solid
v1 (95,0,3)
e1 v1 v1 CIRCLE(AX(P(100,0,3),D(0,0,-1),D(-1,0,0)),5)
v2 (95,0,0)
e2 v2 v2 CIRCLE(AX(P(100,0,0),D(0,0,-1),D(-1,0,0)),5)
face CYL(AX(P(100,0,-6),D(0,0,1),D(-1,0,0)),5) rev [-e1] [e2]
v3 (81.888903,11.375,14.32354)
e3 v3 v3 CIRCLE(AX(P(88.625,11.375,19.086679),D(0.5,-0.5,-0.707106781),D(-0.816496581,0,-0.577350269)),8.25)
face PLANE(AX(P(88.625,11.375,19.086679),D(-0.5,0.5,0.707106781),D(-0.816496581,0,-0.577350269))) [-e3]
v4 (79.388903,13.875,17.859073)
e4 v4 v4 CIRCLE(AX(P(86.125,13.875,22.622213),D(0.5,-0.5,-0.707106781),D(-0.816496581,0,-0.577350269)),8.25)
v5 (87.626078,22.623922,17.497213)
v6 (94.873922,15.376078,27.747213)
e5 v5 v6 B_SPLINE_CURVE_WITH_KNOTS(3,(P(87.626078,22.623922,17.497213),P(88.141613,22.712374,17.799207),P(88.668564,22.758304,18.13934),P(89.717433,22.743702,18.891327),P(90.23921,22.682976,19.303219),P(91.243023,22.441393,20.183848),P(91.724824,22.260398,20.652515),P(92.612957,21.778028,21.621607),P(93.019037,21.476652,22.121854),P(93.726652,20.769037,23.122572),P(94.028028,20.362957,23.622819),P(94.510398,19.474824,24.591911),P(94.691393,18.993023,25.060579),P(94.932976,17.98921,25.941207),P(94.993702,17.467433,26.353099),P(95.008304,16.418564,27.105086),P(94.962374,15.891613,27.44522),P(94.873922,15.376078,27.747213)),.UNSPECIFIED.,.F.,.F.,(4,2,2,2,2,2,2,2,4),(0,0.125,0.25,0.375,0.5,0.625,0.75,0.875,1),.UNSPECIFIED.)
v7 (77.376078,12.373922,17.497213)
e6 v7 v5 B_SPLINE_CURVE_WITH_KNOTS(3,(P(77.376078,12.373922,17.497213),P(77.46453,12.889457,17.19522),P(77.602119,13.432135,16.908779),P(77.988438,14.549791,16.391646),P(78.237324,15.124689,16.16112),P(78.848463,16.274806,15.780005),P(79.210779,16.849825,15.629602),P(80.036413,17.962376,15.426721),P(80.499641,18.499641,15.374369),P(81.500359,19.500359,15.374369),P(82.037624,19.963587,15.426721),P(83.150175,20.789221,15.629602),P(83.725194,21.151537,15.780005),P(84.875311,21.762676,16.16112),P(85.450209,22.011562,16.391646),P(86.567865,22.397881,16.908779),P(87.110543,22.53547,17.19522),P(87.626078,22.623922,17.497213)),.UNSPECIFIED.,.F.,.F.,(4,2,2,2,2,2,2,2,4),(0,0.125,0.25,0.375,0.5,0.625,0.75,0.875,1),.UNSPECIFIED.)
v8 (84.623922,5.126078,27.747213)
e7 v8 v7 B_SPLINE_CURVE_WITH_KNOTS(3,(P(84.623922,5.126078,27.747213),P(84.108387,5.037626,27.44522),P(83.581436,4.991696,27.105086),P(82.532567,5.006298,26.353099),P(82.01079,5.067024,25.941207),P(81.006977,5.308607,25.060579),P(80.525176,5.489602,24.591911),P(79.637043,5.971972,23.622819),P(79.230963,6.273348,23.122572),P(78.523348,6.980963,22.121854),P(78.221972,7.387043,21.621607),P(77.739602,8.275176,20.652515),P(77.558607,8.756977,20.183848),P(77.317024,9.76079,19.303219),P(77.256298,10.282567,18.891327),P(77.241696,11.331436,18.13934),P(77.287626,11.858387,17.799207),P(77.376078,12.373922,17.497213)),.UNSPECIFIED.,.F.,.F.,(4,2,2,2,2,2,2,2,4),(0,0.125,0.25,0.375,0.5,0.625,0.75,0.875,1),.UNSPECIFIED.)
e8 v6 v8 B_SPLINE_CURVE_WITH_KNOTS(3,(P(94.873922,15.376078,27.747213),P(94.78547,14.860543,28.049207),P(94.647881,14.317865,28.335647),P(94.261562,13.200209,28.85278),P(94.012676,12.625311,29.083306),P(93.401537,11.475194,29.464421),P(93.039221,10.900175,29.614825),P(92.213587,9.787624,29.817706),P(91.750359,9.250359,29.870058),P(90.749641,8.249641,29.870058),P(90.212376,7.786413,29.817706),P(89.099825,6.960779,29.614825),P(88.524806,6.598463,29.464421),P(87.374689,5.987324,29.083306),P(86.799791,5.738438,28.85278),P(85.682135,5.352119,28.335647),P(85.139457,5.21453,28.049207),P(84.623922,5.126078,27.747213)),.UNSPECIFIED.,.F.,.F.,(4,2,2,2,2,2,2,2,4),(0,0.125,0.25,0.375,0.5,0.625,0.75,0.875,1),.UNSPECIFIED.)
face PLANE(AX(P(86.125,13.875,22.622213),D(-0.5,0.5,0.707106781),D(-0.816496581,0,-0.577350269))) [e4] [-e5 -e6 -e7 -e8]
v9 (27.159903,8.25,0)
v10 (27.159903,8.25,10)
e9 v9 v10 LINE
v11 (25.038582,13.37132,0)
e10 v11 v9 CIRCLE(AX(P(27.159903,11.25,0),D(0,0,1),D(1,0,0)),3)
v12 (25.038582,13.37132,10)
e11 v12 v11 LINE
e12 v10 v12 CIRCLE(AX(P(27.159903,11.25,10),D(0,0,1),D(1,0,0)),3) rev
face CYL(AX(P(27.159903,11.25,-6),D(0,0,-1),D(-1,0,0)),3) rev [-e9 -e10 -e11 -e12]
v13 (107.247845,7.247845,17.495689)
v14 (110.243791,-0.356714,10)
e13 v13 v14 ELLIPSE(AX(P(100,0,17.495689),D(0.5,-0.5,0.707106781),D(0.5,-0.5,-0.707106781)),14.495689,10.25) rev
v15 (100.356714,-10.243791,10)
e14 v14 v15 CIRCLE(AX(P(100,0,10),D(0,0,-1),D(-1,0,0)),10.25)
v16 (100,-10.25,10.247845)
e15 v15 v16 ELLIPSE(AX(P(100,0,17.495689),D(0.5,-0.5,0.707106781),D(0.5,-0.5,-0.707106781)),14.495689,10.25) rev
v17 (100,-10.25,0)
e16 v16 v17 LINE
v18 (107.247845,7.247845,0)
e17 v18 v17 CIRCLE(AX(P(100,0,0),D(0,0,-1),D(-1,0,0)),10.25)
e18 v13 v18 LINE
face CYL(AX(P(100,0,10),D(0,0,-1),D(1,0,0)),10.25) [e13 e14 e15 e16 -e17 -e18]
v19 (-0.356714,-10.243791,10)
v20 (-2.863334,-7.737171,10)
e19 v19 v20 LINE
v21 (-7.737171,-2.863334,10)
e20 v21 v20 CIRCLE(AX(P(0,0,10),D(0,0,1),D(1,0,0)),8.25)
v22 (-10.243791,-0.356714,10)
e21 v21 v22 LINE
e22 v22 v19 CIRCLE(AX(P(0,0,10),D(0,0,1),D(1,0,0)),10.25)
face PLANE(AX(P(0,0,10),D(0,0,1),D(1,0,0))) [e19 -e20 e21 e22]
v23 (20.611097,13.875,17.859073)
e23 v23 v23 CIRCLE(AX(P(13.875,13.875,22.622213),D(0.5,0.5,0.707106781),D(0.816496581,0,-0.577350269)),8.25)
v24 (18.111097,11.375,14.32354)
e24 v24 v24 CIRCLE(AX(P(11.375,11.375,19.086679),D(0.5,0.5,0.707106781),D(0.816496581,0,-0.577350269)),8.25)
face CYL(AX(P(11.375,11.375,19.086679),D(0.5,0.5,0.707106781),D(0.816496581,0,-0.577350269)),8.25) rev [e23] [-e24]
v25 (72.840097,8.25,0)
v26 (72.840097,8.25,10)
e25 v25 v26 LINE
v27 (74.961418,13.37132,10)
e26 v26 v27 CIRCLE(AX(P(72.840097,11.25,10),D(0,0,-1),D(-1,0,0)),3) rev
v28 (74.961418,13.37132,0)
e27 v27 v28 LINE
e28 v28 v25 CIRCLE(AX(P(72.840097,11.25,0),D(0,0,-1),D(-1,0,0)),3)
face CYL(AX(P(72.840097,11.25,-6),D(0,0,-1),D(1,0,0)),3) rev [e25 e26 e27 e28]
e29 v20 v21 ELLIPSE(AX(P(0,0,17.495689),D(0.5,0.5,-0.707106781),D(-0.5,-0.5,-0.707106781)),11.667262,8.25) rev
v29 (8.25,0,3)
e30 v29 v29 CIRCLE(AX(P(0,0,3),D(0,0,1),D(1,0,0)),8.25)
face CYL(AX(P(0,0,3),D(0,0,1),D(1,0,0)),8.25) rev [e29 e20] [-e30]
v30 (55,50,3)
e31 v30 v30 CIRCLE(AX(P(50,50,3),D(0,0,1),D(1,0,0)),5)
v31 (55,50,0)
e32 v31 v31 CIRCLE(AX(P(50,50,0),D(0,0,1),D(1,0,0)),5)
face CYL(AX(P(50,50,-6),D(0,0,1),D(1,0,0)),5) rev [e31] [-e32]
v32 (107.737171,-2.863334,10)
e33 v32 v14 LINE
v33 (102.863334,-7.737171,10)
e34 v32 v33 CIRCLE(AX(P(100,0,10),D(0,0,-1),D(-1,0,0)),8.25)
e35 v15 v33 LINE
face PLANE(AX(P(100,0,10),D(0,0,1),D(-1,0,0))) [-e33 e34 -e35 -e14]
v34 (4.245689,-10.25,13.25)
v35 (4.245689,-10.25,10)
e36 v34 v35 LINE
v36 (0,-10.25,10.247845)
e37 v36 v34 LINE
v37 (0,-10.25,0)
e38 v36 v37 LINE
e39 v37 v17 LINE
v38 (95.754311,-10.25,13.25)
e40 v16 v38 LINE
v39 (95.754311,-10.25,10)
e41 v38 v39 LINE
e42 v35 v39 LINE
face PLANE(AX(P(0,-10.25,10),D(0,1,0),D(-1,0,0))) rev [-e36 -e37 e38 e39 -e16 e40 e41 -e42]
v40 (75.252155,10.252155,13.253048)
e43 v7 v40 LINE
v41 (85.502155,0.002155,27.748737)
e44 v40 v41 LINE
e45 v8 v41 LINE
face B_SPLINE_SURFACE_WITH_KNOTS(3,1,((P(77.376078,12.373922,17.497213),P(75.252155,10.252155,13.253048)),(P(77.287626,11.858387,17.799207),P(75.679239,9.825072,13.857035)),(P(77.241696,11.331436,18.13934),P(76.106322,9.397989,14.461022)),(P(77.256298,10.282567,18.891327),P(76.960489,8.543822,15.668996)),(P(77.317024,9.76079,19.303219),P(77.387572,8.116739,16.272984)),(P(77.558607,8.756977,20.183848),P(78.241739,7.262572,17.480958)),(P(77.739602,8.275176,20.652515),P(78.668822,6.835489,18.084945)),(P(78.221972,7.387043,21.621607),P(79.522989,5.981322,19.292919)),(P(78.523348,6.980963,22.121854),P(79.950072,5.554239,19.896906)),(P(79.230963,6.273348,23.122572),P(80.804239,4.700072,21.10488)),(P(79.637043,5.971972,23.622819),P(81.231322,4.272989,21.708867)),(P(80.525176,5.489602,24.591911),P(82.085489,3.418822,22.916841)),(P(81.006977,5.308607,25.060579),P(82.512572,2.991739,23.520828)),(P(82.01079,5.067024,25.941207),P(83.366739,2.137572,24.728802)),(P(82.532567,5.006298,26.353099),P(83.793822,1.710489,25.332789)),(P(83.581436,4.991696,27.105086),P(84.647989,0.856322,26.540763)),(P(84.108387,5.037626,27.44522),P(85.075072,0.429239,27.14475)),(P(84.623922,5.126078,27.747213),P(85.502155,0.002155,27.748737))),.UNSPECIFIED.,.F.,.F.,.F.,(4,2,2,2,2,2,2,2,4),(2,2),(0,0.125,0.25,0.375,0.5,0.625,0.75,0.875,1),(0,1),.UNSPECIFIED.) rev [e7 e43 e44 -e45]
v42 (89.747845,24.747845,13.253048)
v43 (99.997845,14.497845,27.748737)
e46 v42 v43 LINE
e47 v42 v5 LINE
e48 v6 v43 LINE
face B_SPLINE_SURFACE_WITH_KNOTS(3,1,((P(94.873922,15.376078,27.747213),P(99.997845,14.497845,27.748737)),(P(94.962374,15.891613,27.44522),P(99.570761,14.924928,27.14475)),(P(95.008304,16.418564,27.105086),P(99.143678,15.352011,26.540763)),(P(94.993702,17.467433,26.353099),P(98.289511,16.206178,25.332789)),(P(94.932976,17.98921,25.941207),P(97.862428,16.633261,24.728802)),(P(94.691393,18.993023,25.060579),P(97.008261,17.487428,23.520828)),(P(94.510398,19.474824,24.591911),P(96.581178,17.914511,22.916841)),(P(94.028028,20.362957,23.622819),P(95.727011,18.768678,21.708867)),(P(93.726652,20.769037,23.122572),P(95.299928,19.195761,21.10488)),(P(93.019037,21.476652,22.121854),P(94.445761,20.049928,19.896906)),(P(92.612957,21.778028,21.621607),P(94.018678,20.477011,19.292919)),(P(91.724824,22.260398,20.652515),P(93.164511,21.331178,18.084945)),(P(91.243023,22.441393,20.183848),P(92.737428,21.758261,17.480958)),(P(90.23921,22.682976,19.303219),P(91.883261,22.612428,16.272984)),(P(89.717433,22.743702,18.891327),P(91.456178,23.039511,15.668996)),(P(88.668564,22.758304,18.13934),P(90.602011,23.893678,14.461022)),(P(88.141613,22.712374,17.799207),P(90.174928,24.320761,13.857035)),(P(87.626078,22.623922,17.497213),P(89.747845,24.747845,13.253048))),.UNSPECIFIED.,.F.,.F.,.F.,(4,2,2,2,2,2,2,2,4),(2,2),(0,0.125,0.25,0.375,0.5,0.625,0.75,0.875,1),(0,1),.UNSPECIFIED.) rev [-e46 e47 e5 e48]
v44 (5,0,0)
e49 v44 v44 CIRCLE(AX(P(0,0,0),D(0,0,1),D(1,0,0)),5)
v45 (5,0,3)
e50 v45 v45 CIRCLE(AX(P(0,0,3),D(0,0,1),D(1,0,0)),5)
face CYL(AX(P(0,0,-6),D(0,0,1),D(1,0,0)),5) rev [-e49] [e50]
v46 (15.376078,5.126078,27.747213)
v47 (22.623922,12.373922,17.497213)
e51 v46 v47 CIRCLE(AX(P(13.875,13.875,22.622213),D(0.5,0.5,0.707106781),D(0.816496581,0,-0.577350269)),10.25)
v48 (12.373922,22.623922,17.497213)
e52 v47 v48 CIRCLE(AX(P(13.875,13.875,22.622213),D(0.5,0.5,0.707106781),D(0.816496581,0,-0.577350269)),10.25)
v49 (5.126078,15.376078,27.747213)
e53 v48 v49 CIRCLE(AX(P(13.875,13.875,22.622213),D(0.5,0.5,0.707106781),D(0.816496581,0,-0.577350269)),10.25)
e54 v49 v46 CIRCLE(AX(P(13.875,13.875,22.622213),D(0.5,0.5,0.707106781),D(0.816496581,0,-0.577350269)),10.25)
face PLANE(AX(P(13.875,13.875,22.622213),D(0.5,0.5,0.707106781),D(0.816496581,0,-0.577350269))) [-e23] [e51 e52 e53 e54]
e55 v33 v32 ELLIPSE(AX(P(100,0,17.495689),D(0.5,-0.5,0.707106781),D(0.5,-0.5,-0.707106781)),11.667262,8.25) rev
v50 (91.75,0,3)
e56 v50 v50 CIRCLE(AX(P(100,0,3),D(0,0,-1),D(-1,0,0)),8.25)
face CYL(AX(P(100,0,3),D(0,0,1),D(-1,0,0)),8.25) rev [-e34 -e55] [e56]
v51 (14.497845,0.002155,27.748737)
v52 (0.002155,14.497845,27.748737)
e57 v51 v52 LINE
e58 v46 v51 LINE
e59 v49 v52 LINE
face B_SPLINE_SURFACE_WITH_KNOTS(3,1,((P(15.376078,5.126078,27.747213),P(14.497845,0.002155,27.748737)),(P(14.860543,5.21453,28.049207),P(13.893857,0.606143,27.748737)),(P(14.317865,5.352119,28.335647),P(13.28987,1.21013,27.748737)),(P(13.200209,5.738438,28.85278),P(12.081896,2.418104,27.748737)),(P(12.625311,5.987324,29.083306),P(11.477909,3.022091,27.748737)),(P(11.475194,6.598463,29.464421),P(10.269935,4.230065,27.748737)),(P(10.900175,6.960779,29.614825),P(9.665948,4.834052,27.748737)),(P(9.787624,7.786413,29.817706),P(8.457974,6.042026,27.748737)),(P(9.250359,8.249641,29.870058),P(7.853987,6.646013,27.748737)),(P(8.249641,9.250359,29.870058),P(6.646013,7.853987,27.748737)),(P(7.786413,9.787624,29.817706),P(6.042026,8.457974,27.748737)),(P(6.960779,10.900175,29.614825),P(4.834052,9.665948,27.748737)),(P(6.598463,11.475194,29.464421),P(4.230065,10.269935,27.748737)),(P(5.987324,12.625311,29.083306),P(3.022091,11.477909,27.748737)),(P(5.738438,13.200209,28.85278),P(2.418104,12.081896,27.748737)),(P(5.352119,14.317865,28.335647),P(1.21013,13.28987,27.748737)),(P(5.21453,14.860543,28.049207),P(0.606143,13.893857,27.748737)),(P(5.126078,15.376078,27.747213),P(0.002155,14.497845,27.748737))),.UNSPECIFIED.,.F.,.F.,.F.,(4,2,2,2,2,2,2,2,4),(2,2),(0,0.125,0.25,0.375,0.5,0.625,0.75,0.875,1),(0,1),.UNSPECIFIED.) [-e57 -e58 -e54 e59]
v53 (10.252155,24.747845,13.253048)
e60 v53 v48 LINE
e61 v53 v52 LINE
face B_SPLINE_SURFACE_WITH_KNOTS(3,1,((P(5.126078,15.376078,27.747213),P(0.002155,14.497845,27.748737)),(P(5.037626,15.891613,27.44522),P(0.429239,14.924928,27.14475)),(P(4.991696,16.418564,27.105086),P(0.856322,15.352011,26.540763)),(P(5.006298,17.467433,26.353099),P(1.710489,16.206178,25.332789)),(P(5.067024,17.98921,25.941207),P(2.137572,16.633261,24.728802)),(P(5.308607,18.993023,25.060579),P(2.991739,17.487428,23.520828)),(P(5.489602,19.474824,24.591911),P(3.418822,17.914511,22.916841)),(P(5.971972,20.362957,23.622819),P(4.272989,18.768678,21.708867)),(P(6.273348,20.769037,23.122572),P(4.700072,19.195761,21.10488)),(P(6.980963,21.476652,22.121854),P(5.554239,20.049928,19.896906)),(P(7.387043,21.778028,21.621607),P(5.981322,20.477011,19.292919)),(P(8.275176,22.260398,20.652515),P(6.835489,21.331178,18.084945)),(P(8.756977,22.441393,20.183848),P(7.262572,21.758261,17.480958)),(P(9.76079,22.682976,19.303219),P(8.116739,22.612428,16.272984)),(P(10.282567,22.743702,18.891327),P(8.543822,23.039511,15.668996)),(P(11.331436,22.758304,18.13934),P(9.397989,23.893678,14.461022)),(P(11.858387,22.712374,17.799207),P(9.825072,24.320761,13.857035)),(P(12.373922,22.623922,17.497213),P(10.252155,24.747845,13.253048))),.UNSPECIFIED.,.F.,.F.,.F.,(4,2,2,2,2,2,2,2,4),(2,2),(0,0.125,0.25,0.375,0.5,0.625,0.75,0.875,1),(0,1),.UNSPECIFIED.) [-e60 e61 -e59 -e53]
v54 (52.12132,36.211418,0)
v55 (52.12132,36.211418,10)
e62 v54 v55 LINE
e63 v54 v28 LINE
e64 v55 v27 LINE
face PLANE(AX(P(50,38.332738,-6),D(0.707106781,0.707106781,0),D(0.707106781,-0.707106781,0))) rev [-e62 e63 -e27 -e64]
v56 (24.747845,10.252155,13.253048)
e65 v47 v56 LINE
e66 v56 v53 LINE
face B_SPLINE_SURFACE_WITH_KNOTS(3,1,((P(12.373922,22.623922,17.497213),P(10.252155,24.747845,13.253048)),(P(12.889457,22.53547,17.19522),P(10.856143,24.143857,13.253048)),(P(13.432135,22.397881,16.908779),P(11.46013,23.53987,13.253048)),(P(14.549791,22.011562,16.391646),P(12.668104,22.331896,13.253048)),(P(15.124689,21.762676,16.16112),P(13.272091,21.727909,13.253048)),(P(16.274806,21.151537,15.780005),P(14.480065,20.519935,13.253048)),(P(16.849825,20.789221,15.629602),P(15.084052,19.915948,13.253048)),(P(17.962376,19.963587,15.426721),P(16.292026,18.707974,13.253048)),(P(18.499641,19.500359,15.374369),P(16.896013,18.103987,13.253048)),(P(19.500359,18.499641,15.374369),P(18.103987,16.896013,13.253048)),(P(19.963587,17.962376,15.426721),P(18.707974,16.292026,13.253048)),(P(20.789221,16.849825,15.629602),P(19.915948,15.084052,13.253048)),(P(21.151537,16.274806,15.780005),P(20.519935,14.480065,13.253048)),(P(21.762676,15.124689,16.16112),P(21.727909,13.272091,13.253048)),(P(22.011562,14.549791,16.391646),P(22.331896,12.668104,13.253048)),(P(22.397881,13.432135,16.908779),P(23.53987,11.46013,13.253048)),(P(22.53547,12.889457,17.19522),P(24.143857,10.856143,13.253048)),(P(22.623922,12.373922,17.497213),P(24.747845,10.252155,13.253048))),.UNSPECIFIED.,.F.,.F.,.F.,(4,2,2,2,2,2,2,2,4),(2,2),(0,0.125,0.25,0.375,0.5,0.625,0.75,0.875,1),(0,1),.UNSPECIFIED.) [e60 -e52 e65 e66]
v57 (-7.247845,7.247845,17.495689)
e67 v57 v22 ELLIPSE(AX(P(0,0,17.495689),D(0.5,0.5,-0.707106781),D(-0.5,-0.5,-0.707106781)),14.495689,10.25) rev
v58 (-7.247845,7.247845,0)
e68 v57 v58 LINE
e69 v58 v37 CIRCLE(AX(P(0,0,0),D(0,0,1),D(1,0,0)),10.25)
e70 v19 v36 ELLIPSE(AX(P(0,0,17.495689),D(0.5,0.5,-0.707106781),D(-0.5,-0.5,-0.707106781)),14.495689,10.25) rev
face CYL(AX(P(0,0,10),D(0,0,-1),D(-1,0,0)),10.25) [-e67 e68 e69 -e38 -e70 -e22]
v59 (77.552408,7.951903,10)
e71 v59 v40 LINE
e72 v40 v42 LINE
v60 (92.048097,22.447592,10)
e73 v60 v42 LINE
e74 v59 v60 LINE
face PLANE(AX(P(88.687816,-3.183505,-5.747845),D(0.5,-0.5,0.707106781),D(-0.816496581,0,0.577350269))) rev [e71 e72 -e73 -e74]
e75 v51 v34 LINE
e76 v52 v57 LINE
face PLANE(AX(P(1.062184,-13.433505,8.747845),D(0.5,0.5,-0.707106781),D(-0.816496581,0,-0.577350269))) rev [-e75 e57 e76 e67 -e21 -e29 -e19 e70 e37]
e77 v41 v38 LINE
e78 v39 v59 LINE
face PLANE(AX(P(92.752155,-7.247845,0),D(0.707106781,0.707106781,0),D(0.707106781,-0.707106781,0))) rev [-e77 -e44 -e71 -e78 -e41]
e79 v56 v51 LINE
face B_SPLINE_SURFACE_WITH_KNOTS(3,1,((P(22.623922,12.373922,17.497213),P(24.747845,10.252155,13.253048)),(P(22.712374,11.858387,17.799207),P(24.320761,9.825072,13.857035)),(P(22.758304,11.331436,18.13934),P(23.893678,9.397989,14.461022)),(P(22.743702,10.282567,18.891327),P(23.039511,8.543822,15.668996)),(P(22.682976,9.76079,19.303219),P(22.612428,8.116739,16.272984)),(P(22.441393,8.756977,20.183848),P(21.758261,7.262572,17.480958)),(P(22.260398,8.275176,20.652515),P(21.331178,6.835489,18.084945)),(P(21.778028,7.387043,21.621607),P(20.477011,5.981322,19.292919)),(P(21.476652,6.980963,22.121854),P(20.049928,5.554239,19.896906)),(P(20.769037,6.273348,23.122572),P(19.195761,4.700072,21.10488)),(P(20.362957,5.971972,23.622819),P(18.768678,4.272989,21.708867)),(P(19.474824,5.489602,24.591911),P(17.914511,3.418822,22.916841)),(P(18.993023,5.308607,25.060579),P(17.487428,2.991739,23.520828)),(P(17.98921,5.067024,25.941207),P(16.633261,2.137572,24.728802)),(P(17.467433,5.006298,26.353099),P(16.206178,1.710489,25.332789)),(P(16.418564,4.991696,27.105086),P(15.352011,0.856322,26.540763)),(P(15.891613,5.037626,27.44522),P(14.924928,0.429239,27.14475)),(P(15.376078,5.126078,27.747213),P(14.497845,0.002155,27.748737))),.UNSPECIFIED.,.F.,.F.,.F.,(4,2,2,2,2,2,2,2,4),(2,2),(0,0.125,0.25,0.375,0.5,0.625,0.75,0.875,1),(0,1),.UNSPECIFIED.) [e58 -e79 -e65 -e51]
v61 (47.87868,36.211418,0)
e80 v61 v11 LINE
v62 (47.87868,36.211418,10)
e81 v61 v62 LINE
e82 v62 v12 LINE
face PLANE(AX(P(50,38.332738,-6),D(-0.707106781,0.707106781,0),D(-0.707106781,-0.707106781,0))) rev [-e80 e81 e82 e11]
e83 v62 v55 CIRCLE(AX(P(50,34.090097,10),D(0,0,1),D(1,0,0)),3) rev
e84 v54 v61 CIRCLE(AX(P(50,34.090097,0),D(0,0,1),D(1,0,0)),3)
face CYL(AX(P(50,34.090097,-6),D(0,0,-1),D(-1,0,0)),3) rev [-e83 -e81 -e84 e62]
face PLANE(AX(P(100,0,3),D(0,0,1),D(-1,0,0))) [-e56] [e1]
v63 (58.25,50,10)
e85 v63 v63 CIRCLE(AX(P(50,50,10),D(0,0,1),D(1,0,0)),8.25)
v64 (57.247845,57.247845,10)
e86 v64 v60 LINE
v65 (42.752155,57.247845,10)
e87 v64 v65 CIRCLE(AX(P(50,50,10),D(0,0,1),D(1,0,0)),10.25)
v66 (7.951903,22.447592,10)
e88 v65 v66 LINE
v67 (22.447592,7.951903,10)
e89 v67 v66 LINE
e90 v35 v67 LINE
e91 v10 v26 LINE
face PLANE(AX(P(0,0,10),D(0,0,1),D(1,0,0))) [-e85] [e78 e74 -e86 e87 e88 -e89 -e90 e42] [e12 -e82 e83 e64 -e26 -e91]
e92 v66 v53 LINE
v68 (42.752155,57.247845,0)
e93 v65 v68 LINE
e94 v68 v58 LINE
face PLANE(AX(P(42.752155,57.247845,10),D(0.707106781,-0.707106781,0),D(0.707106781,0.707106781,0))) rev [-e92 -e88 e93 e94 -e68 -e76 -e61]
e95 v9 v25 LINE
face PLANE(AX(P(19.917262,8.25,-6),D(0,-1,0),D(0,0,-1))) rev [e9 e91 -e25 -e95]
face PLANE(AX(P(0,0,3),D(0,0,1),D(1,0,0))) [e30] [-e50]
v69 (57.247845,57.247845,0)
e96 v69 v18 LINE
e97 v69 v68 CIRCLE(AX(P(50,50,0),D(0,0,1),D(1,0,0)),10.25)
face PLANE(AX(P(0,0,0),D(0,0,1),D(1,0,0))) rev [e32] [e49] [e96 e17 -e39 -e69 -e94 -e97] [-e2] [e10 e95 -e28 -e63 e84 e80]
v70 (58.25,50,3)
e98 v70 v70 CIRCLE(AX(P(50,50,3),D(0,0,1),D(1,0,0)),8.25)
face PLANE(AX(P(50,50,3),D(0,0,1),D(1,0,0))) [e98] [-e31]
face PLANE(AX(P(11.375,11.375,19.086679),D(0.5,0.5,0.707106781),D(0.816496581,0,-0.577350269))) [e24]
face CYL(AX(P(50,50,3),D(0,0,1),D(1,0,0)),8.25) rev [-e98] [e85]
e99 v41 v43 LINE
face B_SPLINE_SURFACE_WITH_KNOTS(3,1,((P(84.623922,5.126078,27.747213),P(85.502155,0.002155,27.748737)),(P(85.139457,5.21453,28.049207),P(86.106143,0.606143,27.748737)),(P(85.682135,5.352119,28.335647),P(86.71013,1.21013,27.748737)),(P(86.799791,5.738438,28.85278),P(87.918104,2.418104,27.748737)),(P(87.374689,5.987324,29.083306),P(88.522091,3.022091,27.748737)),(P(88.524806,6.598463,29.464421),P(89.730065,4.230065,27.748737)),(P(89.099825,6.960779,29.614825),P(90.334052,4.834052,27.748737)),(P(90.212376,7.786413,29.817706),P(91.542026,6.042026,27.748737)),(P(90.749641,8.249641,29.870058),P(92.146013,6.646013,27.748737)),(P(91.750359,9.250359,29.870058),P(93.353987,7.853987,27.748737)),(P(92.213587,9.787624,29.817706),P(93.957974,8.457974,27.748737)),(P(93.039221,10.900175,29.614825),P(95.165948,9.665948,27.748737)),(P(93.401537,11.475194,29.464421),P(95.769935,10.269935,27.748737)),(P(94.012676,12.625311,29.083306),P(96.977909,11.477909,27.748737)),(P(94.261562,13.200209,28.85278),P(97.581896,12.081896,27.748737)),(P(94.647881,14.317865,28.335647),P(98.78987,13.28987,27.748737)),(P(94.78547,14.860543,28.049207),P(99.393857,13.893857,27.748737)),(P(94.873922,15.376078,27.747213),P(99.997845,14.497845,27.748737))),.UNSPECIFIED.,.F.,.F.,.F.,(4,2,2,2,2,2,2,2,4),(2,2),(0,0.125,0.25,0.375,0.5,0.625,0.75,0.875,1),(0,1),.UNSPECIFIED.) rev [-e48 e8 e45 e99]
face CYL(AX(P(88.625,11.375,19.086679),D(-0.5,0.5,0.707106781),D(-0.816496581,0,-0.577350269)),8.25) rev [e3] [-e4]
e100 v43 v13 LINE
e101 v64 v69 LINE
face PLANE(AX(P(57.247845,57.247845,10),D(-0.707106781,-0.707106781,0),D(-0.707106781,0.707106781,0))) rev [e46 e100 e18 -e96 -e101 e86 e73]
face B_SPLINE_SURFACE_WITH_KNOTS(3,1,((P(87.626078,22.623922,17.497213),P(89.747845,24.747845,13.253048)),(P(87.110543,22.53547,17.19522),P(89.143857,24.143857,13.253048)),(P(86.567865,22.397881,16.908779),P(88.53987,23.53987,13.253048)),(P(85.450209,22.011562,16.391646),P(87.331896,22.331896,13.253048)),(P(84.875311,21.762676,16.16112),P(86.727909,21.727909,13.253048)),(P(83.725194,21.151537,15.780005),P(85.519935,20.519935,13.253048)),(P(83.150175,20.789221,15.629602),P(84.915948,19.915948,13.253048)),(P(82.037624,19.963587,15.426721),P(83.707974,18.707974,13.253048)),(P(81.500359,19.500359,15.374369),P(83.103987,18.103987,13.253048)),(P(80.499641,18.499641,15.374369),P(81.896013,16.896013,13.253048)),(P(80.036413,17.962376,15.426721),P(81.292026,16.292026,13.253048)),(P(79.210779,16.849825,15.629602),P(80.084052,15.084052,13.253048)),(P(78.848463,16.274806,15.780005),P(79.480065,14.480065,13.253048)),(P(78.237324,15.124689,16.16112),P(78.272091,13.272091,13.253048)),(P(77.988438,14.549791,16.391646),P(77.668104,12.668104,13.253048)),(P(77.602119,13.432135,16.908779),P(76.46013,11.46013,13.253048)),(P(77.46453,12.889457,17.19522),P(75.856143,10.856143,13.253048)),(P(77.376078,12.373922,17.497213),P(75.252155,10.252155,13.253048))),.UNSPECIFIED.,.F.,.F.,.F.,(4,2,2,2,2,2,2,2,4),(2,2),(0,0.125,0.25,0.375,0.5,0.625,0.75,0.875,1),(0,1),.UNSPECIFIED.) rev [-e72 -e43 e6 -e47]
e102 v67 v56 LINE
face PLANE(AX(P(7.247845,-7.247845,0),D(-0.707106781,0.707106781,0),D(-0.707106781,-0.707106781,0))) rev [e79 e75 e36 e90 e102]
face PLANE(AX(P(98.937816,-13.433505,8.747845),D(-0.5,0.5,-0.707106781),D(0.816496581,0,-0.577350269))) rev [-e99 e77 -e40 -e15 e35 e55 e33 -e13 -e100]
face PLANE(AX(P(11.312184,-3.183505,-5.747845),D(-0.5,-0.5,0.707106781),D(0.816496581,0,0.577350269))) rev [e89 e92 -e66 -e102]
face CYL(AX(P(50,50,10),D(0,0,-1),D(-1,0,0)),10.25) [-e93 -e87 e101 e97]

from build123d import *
from build123d.topology import SkipClean

# Parameters (mm, degrees)
BOSS_EXTRUDE1_DEPTH = 10
SKETCH2_R           = 8.25
CUT_EXTRUDE1_DEPTH  = 7
CUT_EXTRUDE2_DEPTH  = 16
FILLET2_R           = 3
SKETCH5_R           = 5
CUT_EXTRUDE3_DEPTH  = 16
BOSS_EXTRUDE2_DEPTH = 20.5
CUT_EXTRUDE4_START  = 20
SKETCH7_R           = 8.25
SKETCH7_R_2         = 5
CUT_EXTRUDE4_DEPTH  = 20
SKETCH9_R           = 8.25
CUT_EXTRUDE5_DEPTH  = 5
SKETCH10_W          = 60.25
SKETCH10_H          = 70.5
CUT_EXTRUDE6_DEPTH  = 45


with BuildPart() as part:
    # Sketch1 → Boss-Extrude1 (new body)
    with BuildSketch(Plane.XY):
        with BuildLine():
            Line((0, 10.25), (100, 10.25))
            ThreePointArc((100, 10.25), (110.25, 0), (100, -10.25))
            Line((100, -10.25), (0, -10.25))
            ThreePointArc((0, -10.25), (-10.25, 0), (0, 10.25))
        make_face()
        with BuildLine():
            Line((92.752155493, -7.247844507), (42.752155493, 42.752155493))
            ThreePointArc((42.752155493, 42.752155493), (42.752155493, 57.247844507), (57.247844507, 57.247844507))
            Line((57.247844507, 57.247844507), (107.247844507, 7.247844507))
            ThreePointArc((107.247844507, 7.247844507), (107.247844507, -7.247844507), (92.752155493, -7.247844507))
        make_face()
        with BuildLine():
            Line((57.247844507, 42.752155493), (7.247844507, -7.247844507))
            ThreePointArc((7.247844507, -7.247844507), (-7.247844507, -7.247844507), (-7.247844507, 7.247844507))
            Line((-7.247844507, 7.247844507), (42.752155493, 57.247844507))
            ThreePointArc((42.752155493, 57.247844507), (57.247844507, 57.247844507), (57.247844507, 42.752155493))
        make_face()
    extrude(amount=BOSS_EXTRUDE1_DEPTH)

    # Sketch2 → Cut-Extrude1 (cut)
    with BuildSketch(Plane.XY.offset(10)):
        with Locations((50, 50)):
            Circle(SKETCH2_R)
        with Locations((100, 0)):
            Circle(SKETCH2_R)
        Circle(SKETCH2_R)
    extrude(amount=-CUT_EXTRUDE1_DEPTH, mode=Mode.SUBTRACT)

    # Sketch4 → Cut-Extrude2 (cut)
    with BuildSketch(Plane.XY.offset(10)):
        Polygon((19.91726189, 8.25), (80.08273811, 8.25), (50, 38.33273811), align=None)
    extrude(amount=-CUT_EXTRUDE2_DEPTH, mode=Mode.SUBTRACT)

    # Fillet2
    fillet2_edges = [part.edges().sort_by_distance(p)[0] for p in [
        (19.91726189, 8.25, 5),
        (50, 38.33273811, 5),
        (80.08273811, 8.25, 5),
    ]]
    fillet(fillet2_edges, radius=FILLET2_R)

    # Sketch5 → Cut-Extrude3 (cut)
    with BuildSketch(Plane.XY.offset(10)):
        Circle(SKETCH5_R)
        with Locations((50, 50)):
            Circle(SKETCH5_R)
        with Locations((100, 0)):
            Circle(SKETCH5_R)
    extrude(amount=-CUT_EXTRUDE3_DEPTH, mode=Mode.SUBTRACT)

    # Sketch6 → Boss-Extrude2 (add)
    with BuildSketch(Plane(origin=(-7.247844507, 7.247844507, 0), x_dir=(0, 0, 1), z_dir=(-0.7071067811865441, 0.7071067811865509, 0))):
        Polygon((10, 21.495689014), (10, 7), (20.500892834, 17.500892834), (13.253048327, 24.748737342), align=None)
        Polygon((20.500892834, 17.500892834), (10, 7), (10, 0), (10, -7.495689014), (27.748737342, 10.253048327), align=None)
    extrude(amount=-BOSS_EXTRUDE2_DEPTH)

    # Sketch7 → Cut-Extrude4 (cut)
    # profile 1 of 3: a face of its own
    with BuildSketch(Plane.XY.offset(10).offset(CUT_EXTRUDE4_START)):
        with BuildLine():
            Line((20, -20.25), (20, -10.25))
            Line((20, -10.25), (4.245689014, -10.25))
            Line((4.245689014, -10.25), (0, -10.25))
            ThreePointArc((0, -10.25), (-9.469765208, -3.922505182), (-7.247844507, 7.247844507))
            Line((-7.247844507, 7.247844507), (7.951902961, 22.447591975))
            Line((7.951902961, 22.447591975), (15.254310986, 29.75))
            Line((15.254310986, 29.75), (-20, 29.75))
            Line((-20, 29.75), (-20, -20.25))
            Line((-20, -20.25), (20, -20.25))
        make_face()
    # profile 2 of 3: a face of its own
    with BuildSketch(Plane.XY.offset(10).offset(CUT_EXTRUDE4_START)):
        Circle(SKETCH7_R)
        Circle(SKETCH7_R_2, mode=Mode.SUBTRACT)
    # profile 3 of 3: a face of its own
    with BuildSketch(Plane.XY.offset(10).offset(CUT_EXTRUDE4_START)):
        Circle(SKETCH7_R_2)
    extrude(amount=-CUT_EXTRUDE4_DEPTH, mode=Mode.SUBTRACT)

    # Loft1: read off the stored shape, not the designer's step
    # Loft1: loft between two sections, ruled curve by curve
    loft1_from = [
        Edge.make_bspline([(12.373922254, 22.623922254, 17.497213178), (12.889457441, 22.535470399, 17.195219657), (13.432134989, 22.397880865, 16.908779176), (14.549790596, 22.011562197, 16.391645867), (15.124688663, 21.762676267, 16.161120474), (16.274806274, 21.151537295, 15.780005023), (16.849824782, 20.789221108, 15.629601769), (17.962375724, 19.963587433, 15.426720624), (18.499640751, 19.500359249, 15.374368671), (19.500359249, 18.499640751, 15.374368671), (19.963587433, 17.962375724, 15.426720624), (20.789221108, 16.849824782, 15.629601769), (21.151537295, 16.274806274, 15.780005023), (21.762676267, 15.124688663, 16.161120474), (22.011562197, 14.549790596, 16.391645867), (22.397880865, 13.432134989, 16.908779176), (22.535470399, 12.889457441, 17.195219657), (22.623922254, 12.373922254, 17.497213178)], [0, 0, 0, 0, 0.125, 0.125, 0.25, 0.25, 0.375, 0.375, 0.5, 0.5, 0.625, 0.625, 0.75, 0.75, 0.875, 0.875, 1, 1, 1, 1], 3),
        Edge.make_bspline([(22.623922254, 12.373922254, 17.497213178), (22.712374108, 11.858387066, 17.799206699), (22.758303856, 11.331435851, 18.13934024), (22.743701961, 10.282567338, 18.891327377), (22.682975729, 9.76079032, 19.303219376), (22.441392942, 8.756976633, 20.183847667), (22.260398337, 8.27517552, 20.652515015), (21.778027739, 7.387042631, 21.621607323), (21.476651925, 6.980962911, 22.121853929), (20.769037089, 6.273348075, 23.122572427), (20.362957369, 5.971972261, 23.622819032), (19.47482448, 5.489601663, 24.591911341), (18.993023367, 5.308607058, 25.060578689), (17.98920968, 5.067024271, 25.94120698), (17.467432662, 5.006298039, 26.353098979), (16.418564149, 4.991696144, 27.105086116), (15.891612934, 5.037625892, 27.445219657), (15.376077746, 5.126077746, 27.747213178)], [0, 0, 0, 0, 0.125, 0.125, 0.25, 0.25, 0.375, 0.375, 0.5, 0.5, 0.625, 0.625, 0.75, 0.75, 0.875, 0.875, 1, 1, 1, 1], 3),
        Edge.make_bspline([(5.126077746, 15.376077746, 27.747213178), (5.037625892, 15.891612934, 27.445219657), (4.991696144, 16.418564149, 27.105086116), (5.006298039, 17.467432662, 26.353098979), (5.067024271, 17.98920968, 25.94120698), (5.308607058, 18.993023367, 25.060578689), (5.489601663, 19.47482448, 24.591911341), (5.971972261, 20.362957369, 23.622819032), (6.273348075, 20.769037089, 23.122572427), (6.980962911, 21.476651925, 22.121853929), (7.387042631, 21.778027739, 21.621607323), (8.27517552, 22.260398337, 20.652515015), (8.756976633, 22.441392942, 20.183847667), (9.76079032, 22.682975729, 19.303219376), (10.282567338, 22.743701961, 18.891327377), (11.331435851, 22.758303856, 18.13934024), (11.858387066, 22.712374108, 17.799206699), (12.373922254, 22.623922254, 17.497213178)], [0, 0, 0, 0, 0.125, 0.125, 0.25, 0.25, 0.375, 0.375, 0.5, 0.5, 0.625, 0.625, 0.75, 0.75, 0.875, 0.875, 1, 1, 1, 1], 3),
        Edge.make_bspline([(15.376077746, 5.126077746, 27.747213178), (14.860542559, 5.214529601, 28.049206699), (14.317865011, 5.352119135, 28.33564718), (13.200209404, 5.738437803, 28.852780489), (12.625311337, 5.987323733, 29.083305882), (11.475193726, 6.598462705, 29.464421332), (10.900175218, 6.960778892, 29.614824586), (9.787624276, 7.786412567, 29.817705732), (9.250359249, 8.249640751, 29.870057685), (8.249640751, 9.250359249, 29.870057685), (7.786412567, 9.787624276, 29.817705732), (6.960778892, 10.900175218, 29.614824586), (6.598462705, 11.475193726, 29.464421332), (5.987323733, 12.625311337, 29.083305882), (5.738437803, 13.200209404, 28.852780489), (5.352119135, 14.317865011, 28.33564718), (5.214529601, 14.860542559, 28.049206699), (5.126077746, 15.376077746, 27.747213178)], [0, 0, 0, 0, 0.125, 0.125, 0.25, 0.25, 0.375, 0.375, 0.5, 0.5, 0.625, 0.625, 0.75, 0.75, 0.875, 0.875, 1, 1, 1, 1], 3),
    ]
    loft1_to = [
        Edge.make_bspline([(10.252155493, 24.747844507, 13.253048327), (10.856142535, 24.143857465, 13.253048327), (11.460129577, 23.539870423, 13.253048327), (12.668103662, 22.331896338, 13.253048327), (13.272090704, 21.727909296, 13.253048327), (14.480064789, 20.519935211, 13.253048327), (15.084051831, 19.915948169, 13.253048327), (16.292025915, 18.707974085, 13.253048327), (16.896012958, 18.103987042, 13.253048327), (18.103987042, 16.896012958, 13.253048327), (18.707974085, 16.292025915, 13.253048327), (19.915948169, 15.084051831, 13.253048327), (20.519935211, 14.480064789, 13.253048327), (21.727909296, 13.272090704, 13.253048327), (22.331896338, 12.668103662, 13.253048327), (23.539870423, 11.460129577, 13.253048327), (24.143857465, 10.856142535, 13.253048327), (24.747844507, 10.252155493, 13.253048327)], [0, 0, 0, 0, 0.125, 0.125, 0.25, 0.25, 0.375, 0.375, 0.5, 0.5, 0.625, 0.625, 0.75, 0.75, 0.875, 0.875, 1, 1, 1, 1], 3),
        Edge.make_bspline([(24.747844507, 10.252155493, 13.253048327), (24.320761174, 9.82507216, 13.857035369), (23.89367784, 9.397988826, 14.461022412), (23.039511174, 8.54382216, 15.668996496), (22.61242784, 8.116738826, 16.272983539), (21.758261174, 7.26257216, 17.480957623), (21.33117784, 6.835488826, 18.084944665), (20.477011174, 5.98132216, 19.29291875), (20.04992784, 5.554238826, 19.896905792), (19.195761174, 4.70007216, 21.104879877), (18.76867784, 4.272988826, 21.708866919), (17.914511174, 3.41882216, 22.916841003), (17.48742784, 2.991738826, 23.520828046), (16.633261174, 2.13757216, 24.72880213), (16.20617784, 1.710488826, 25.332789172), (15.352011174, 0.85632216, 26.540763257), (14.92492784, 0.429238826, 27.144750299), (14.497844507, 0.002155493, 27.748737342)], [0, 0, 0, 0, 0.125, 0.125, 0.25, 0.25, 0.375, 0.375, 0.5, 0.5, 0.625, 0.625, 0.75, 0.75, 0.875, 0.875, 1, 1, 1, 1], 3),
        Edge.make_bspline([(0.002155493, 14.497844507, 27.748737342), (0.429238826, 14.92492784, 27.144750299), (0.85632216, 15.352011174, 26.540763257), (1.710488826, 16.20617784, 25.332789172), (2.13757216, 16.633261174, 24.72880213), (2.991738826, 17.48742784, 23.520828046), (3.41882216, 17.914511174, 22.916841003), (4.272988826, 18.76867784, 21.708866919), (4.70007216, 19.195761174, 21.104879877), (5.554238826, 20.04992784, 19.896905792), (5.98132216, 20.477011174, 19.29291875), (6.835488826, 21.33117784, 18.084944665), (7.26257216, 21.758261174, 17.480957623), (8.116738826, 22.61242784, 16.272983539), (8.54382216, 23.039511174, 15.668996496), (9.397988826, 23.89367784, 14.461022412), (9.82507216, 24.320761174, 13.857035369), (10.252155493, 24.747844507, 13.253048327)], [0, 0, 0, 0, 0.125, 0.125, 0.25, 0.25, 0.375, 0.375, 0.5, 0.5, 0.625, 0.625, 0.75, 0.75, 0.875, 0.875, 1, 1, 1, 1], 3),
        Edge.make_bspline([(14.497844507, 0.002155493, 27.748737342), (13.893857465, 0.606142535, 27.748737342), (13.289870423, 1.210129577, 27.748737342), (12.081896338, 2.418103662, 27.748737342), (11.477909296, 3.022090704, 27.748737342), (10.269935211, 4.230064789, 27.748737342), (9.665948169, 4.834051831, 27.748737342), (8.457974085, 6.042025915, 27.748737342), (7.853987042, 6.646012958, 27.748737342), (6.646012958, 7.853987042, 27.748737342), (6.042025915, 8.457974085, 27.748737342), (4.834051831, 9.665948169, 27.748737342), (4.230064789, 10.269935211, 27.748737342), (3.022090704, 11.477909296, 27.748737342), (2.418103662, 12.081896338, 27.748737342), (1.210129577, 13.289870423, 27.748737342), (0.606142535, 13.893857465, 27.748737342), (0.002155493, 14.497844507, 27.748737342)], [0, 0, 0, 0, 0.125, 0.125, 0.25, 0.25, 0.375, 0.375, 0.5, 0.5, 0.625, 0.625, 0.75, 0.75, 0.875, 0.875, 1, 1, 1, 1], 3),
    ]
    loft1 = Solid(Shell([*[Face.make_surface_from_curves(loft1_from[k], loft1_to[k]) for k in range(4)], Face(Wire(loft1_from)), Face(Wire(loft1_to))]))
    add(loft1)

    # Sketch9 → Cut-Extrude5 (cut)
    with BuildSketch(Plane(origin=(14.935660172, 14.935660172, 21.122213178), x_dir=(0.8660254037844357, -0.2886751345948172, -0.40824829046386635), z_dir=(0.5000000000000052, 0.5000000000000007, 0.7071067811865435))):
        with Locations(Location((-1.224744871, -1.732050808, 0), (0, 0, 19.471220634))):
            Circle(SKETCH9_R)
    extrude(amount=-CUT_EXTRUDE5_DEPTH, mode=Mode.SUBTRACT)

    # Sketch10 → Cut-Extrude6 (cut)
    with BuildSketch(Plane(origin=(0, 0, 0), x_dir=(-1, 0, 0), z_dir=(0, 0, -1))):
        with Locations((-80.125, 25)):
            Rectangle(SKETCH10_W, SKETCH10_H)
    extrude(amount=-CUT_EXTRUDE6_DEPTH, mode=Mode.SUBTRACT)

    # Mirror1: part across plane


with BuildPart() as part_1:
    with SkipClean():  # the faces are left unmerged after this step: merging them gives an invalid solid
        add(part.part)
        add(part.part.mirror(Plane(origin=(50, 60.25, 45), x_dir=(0, 0, 1), z_dir=(-1, 0, 0))))


solid = part_1.part
